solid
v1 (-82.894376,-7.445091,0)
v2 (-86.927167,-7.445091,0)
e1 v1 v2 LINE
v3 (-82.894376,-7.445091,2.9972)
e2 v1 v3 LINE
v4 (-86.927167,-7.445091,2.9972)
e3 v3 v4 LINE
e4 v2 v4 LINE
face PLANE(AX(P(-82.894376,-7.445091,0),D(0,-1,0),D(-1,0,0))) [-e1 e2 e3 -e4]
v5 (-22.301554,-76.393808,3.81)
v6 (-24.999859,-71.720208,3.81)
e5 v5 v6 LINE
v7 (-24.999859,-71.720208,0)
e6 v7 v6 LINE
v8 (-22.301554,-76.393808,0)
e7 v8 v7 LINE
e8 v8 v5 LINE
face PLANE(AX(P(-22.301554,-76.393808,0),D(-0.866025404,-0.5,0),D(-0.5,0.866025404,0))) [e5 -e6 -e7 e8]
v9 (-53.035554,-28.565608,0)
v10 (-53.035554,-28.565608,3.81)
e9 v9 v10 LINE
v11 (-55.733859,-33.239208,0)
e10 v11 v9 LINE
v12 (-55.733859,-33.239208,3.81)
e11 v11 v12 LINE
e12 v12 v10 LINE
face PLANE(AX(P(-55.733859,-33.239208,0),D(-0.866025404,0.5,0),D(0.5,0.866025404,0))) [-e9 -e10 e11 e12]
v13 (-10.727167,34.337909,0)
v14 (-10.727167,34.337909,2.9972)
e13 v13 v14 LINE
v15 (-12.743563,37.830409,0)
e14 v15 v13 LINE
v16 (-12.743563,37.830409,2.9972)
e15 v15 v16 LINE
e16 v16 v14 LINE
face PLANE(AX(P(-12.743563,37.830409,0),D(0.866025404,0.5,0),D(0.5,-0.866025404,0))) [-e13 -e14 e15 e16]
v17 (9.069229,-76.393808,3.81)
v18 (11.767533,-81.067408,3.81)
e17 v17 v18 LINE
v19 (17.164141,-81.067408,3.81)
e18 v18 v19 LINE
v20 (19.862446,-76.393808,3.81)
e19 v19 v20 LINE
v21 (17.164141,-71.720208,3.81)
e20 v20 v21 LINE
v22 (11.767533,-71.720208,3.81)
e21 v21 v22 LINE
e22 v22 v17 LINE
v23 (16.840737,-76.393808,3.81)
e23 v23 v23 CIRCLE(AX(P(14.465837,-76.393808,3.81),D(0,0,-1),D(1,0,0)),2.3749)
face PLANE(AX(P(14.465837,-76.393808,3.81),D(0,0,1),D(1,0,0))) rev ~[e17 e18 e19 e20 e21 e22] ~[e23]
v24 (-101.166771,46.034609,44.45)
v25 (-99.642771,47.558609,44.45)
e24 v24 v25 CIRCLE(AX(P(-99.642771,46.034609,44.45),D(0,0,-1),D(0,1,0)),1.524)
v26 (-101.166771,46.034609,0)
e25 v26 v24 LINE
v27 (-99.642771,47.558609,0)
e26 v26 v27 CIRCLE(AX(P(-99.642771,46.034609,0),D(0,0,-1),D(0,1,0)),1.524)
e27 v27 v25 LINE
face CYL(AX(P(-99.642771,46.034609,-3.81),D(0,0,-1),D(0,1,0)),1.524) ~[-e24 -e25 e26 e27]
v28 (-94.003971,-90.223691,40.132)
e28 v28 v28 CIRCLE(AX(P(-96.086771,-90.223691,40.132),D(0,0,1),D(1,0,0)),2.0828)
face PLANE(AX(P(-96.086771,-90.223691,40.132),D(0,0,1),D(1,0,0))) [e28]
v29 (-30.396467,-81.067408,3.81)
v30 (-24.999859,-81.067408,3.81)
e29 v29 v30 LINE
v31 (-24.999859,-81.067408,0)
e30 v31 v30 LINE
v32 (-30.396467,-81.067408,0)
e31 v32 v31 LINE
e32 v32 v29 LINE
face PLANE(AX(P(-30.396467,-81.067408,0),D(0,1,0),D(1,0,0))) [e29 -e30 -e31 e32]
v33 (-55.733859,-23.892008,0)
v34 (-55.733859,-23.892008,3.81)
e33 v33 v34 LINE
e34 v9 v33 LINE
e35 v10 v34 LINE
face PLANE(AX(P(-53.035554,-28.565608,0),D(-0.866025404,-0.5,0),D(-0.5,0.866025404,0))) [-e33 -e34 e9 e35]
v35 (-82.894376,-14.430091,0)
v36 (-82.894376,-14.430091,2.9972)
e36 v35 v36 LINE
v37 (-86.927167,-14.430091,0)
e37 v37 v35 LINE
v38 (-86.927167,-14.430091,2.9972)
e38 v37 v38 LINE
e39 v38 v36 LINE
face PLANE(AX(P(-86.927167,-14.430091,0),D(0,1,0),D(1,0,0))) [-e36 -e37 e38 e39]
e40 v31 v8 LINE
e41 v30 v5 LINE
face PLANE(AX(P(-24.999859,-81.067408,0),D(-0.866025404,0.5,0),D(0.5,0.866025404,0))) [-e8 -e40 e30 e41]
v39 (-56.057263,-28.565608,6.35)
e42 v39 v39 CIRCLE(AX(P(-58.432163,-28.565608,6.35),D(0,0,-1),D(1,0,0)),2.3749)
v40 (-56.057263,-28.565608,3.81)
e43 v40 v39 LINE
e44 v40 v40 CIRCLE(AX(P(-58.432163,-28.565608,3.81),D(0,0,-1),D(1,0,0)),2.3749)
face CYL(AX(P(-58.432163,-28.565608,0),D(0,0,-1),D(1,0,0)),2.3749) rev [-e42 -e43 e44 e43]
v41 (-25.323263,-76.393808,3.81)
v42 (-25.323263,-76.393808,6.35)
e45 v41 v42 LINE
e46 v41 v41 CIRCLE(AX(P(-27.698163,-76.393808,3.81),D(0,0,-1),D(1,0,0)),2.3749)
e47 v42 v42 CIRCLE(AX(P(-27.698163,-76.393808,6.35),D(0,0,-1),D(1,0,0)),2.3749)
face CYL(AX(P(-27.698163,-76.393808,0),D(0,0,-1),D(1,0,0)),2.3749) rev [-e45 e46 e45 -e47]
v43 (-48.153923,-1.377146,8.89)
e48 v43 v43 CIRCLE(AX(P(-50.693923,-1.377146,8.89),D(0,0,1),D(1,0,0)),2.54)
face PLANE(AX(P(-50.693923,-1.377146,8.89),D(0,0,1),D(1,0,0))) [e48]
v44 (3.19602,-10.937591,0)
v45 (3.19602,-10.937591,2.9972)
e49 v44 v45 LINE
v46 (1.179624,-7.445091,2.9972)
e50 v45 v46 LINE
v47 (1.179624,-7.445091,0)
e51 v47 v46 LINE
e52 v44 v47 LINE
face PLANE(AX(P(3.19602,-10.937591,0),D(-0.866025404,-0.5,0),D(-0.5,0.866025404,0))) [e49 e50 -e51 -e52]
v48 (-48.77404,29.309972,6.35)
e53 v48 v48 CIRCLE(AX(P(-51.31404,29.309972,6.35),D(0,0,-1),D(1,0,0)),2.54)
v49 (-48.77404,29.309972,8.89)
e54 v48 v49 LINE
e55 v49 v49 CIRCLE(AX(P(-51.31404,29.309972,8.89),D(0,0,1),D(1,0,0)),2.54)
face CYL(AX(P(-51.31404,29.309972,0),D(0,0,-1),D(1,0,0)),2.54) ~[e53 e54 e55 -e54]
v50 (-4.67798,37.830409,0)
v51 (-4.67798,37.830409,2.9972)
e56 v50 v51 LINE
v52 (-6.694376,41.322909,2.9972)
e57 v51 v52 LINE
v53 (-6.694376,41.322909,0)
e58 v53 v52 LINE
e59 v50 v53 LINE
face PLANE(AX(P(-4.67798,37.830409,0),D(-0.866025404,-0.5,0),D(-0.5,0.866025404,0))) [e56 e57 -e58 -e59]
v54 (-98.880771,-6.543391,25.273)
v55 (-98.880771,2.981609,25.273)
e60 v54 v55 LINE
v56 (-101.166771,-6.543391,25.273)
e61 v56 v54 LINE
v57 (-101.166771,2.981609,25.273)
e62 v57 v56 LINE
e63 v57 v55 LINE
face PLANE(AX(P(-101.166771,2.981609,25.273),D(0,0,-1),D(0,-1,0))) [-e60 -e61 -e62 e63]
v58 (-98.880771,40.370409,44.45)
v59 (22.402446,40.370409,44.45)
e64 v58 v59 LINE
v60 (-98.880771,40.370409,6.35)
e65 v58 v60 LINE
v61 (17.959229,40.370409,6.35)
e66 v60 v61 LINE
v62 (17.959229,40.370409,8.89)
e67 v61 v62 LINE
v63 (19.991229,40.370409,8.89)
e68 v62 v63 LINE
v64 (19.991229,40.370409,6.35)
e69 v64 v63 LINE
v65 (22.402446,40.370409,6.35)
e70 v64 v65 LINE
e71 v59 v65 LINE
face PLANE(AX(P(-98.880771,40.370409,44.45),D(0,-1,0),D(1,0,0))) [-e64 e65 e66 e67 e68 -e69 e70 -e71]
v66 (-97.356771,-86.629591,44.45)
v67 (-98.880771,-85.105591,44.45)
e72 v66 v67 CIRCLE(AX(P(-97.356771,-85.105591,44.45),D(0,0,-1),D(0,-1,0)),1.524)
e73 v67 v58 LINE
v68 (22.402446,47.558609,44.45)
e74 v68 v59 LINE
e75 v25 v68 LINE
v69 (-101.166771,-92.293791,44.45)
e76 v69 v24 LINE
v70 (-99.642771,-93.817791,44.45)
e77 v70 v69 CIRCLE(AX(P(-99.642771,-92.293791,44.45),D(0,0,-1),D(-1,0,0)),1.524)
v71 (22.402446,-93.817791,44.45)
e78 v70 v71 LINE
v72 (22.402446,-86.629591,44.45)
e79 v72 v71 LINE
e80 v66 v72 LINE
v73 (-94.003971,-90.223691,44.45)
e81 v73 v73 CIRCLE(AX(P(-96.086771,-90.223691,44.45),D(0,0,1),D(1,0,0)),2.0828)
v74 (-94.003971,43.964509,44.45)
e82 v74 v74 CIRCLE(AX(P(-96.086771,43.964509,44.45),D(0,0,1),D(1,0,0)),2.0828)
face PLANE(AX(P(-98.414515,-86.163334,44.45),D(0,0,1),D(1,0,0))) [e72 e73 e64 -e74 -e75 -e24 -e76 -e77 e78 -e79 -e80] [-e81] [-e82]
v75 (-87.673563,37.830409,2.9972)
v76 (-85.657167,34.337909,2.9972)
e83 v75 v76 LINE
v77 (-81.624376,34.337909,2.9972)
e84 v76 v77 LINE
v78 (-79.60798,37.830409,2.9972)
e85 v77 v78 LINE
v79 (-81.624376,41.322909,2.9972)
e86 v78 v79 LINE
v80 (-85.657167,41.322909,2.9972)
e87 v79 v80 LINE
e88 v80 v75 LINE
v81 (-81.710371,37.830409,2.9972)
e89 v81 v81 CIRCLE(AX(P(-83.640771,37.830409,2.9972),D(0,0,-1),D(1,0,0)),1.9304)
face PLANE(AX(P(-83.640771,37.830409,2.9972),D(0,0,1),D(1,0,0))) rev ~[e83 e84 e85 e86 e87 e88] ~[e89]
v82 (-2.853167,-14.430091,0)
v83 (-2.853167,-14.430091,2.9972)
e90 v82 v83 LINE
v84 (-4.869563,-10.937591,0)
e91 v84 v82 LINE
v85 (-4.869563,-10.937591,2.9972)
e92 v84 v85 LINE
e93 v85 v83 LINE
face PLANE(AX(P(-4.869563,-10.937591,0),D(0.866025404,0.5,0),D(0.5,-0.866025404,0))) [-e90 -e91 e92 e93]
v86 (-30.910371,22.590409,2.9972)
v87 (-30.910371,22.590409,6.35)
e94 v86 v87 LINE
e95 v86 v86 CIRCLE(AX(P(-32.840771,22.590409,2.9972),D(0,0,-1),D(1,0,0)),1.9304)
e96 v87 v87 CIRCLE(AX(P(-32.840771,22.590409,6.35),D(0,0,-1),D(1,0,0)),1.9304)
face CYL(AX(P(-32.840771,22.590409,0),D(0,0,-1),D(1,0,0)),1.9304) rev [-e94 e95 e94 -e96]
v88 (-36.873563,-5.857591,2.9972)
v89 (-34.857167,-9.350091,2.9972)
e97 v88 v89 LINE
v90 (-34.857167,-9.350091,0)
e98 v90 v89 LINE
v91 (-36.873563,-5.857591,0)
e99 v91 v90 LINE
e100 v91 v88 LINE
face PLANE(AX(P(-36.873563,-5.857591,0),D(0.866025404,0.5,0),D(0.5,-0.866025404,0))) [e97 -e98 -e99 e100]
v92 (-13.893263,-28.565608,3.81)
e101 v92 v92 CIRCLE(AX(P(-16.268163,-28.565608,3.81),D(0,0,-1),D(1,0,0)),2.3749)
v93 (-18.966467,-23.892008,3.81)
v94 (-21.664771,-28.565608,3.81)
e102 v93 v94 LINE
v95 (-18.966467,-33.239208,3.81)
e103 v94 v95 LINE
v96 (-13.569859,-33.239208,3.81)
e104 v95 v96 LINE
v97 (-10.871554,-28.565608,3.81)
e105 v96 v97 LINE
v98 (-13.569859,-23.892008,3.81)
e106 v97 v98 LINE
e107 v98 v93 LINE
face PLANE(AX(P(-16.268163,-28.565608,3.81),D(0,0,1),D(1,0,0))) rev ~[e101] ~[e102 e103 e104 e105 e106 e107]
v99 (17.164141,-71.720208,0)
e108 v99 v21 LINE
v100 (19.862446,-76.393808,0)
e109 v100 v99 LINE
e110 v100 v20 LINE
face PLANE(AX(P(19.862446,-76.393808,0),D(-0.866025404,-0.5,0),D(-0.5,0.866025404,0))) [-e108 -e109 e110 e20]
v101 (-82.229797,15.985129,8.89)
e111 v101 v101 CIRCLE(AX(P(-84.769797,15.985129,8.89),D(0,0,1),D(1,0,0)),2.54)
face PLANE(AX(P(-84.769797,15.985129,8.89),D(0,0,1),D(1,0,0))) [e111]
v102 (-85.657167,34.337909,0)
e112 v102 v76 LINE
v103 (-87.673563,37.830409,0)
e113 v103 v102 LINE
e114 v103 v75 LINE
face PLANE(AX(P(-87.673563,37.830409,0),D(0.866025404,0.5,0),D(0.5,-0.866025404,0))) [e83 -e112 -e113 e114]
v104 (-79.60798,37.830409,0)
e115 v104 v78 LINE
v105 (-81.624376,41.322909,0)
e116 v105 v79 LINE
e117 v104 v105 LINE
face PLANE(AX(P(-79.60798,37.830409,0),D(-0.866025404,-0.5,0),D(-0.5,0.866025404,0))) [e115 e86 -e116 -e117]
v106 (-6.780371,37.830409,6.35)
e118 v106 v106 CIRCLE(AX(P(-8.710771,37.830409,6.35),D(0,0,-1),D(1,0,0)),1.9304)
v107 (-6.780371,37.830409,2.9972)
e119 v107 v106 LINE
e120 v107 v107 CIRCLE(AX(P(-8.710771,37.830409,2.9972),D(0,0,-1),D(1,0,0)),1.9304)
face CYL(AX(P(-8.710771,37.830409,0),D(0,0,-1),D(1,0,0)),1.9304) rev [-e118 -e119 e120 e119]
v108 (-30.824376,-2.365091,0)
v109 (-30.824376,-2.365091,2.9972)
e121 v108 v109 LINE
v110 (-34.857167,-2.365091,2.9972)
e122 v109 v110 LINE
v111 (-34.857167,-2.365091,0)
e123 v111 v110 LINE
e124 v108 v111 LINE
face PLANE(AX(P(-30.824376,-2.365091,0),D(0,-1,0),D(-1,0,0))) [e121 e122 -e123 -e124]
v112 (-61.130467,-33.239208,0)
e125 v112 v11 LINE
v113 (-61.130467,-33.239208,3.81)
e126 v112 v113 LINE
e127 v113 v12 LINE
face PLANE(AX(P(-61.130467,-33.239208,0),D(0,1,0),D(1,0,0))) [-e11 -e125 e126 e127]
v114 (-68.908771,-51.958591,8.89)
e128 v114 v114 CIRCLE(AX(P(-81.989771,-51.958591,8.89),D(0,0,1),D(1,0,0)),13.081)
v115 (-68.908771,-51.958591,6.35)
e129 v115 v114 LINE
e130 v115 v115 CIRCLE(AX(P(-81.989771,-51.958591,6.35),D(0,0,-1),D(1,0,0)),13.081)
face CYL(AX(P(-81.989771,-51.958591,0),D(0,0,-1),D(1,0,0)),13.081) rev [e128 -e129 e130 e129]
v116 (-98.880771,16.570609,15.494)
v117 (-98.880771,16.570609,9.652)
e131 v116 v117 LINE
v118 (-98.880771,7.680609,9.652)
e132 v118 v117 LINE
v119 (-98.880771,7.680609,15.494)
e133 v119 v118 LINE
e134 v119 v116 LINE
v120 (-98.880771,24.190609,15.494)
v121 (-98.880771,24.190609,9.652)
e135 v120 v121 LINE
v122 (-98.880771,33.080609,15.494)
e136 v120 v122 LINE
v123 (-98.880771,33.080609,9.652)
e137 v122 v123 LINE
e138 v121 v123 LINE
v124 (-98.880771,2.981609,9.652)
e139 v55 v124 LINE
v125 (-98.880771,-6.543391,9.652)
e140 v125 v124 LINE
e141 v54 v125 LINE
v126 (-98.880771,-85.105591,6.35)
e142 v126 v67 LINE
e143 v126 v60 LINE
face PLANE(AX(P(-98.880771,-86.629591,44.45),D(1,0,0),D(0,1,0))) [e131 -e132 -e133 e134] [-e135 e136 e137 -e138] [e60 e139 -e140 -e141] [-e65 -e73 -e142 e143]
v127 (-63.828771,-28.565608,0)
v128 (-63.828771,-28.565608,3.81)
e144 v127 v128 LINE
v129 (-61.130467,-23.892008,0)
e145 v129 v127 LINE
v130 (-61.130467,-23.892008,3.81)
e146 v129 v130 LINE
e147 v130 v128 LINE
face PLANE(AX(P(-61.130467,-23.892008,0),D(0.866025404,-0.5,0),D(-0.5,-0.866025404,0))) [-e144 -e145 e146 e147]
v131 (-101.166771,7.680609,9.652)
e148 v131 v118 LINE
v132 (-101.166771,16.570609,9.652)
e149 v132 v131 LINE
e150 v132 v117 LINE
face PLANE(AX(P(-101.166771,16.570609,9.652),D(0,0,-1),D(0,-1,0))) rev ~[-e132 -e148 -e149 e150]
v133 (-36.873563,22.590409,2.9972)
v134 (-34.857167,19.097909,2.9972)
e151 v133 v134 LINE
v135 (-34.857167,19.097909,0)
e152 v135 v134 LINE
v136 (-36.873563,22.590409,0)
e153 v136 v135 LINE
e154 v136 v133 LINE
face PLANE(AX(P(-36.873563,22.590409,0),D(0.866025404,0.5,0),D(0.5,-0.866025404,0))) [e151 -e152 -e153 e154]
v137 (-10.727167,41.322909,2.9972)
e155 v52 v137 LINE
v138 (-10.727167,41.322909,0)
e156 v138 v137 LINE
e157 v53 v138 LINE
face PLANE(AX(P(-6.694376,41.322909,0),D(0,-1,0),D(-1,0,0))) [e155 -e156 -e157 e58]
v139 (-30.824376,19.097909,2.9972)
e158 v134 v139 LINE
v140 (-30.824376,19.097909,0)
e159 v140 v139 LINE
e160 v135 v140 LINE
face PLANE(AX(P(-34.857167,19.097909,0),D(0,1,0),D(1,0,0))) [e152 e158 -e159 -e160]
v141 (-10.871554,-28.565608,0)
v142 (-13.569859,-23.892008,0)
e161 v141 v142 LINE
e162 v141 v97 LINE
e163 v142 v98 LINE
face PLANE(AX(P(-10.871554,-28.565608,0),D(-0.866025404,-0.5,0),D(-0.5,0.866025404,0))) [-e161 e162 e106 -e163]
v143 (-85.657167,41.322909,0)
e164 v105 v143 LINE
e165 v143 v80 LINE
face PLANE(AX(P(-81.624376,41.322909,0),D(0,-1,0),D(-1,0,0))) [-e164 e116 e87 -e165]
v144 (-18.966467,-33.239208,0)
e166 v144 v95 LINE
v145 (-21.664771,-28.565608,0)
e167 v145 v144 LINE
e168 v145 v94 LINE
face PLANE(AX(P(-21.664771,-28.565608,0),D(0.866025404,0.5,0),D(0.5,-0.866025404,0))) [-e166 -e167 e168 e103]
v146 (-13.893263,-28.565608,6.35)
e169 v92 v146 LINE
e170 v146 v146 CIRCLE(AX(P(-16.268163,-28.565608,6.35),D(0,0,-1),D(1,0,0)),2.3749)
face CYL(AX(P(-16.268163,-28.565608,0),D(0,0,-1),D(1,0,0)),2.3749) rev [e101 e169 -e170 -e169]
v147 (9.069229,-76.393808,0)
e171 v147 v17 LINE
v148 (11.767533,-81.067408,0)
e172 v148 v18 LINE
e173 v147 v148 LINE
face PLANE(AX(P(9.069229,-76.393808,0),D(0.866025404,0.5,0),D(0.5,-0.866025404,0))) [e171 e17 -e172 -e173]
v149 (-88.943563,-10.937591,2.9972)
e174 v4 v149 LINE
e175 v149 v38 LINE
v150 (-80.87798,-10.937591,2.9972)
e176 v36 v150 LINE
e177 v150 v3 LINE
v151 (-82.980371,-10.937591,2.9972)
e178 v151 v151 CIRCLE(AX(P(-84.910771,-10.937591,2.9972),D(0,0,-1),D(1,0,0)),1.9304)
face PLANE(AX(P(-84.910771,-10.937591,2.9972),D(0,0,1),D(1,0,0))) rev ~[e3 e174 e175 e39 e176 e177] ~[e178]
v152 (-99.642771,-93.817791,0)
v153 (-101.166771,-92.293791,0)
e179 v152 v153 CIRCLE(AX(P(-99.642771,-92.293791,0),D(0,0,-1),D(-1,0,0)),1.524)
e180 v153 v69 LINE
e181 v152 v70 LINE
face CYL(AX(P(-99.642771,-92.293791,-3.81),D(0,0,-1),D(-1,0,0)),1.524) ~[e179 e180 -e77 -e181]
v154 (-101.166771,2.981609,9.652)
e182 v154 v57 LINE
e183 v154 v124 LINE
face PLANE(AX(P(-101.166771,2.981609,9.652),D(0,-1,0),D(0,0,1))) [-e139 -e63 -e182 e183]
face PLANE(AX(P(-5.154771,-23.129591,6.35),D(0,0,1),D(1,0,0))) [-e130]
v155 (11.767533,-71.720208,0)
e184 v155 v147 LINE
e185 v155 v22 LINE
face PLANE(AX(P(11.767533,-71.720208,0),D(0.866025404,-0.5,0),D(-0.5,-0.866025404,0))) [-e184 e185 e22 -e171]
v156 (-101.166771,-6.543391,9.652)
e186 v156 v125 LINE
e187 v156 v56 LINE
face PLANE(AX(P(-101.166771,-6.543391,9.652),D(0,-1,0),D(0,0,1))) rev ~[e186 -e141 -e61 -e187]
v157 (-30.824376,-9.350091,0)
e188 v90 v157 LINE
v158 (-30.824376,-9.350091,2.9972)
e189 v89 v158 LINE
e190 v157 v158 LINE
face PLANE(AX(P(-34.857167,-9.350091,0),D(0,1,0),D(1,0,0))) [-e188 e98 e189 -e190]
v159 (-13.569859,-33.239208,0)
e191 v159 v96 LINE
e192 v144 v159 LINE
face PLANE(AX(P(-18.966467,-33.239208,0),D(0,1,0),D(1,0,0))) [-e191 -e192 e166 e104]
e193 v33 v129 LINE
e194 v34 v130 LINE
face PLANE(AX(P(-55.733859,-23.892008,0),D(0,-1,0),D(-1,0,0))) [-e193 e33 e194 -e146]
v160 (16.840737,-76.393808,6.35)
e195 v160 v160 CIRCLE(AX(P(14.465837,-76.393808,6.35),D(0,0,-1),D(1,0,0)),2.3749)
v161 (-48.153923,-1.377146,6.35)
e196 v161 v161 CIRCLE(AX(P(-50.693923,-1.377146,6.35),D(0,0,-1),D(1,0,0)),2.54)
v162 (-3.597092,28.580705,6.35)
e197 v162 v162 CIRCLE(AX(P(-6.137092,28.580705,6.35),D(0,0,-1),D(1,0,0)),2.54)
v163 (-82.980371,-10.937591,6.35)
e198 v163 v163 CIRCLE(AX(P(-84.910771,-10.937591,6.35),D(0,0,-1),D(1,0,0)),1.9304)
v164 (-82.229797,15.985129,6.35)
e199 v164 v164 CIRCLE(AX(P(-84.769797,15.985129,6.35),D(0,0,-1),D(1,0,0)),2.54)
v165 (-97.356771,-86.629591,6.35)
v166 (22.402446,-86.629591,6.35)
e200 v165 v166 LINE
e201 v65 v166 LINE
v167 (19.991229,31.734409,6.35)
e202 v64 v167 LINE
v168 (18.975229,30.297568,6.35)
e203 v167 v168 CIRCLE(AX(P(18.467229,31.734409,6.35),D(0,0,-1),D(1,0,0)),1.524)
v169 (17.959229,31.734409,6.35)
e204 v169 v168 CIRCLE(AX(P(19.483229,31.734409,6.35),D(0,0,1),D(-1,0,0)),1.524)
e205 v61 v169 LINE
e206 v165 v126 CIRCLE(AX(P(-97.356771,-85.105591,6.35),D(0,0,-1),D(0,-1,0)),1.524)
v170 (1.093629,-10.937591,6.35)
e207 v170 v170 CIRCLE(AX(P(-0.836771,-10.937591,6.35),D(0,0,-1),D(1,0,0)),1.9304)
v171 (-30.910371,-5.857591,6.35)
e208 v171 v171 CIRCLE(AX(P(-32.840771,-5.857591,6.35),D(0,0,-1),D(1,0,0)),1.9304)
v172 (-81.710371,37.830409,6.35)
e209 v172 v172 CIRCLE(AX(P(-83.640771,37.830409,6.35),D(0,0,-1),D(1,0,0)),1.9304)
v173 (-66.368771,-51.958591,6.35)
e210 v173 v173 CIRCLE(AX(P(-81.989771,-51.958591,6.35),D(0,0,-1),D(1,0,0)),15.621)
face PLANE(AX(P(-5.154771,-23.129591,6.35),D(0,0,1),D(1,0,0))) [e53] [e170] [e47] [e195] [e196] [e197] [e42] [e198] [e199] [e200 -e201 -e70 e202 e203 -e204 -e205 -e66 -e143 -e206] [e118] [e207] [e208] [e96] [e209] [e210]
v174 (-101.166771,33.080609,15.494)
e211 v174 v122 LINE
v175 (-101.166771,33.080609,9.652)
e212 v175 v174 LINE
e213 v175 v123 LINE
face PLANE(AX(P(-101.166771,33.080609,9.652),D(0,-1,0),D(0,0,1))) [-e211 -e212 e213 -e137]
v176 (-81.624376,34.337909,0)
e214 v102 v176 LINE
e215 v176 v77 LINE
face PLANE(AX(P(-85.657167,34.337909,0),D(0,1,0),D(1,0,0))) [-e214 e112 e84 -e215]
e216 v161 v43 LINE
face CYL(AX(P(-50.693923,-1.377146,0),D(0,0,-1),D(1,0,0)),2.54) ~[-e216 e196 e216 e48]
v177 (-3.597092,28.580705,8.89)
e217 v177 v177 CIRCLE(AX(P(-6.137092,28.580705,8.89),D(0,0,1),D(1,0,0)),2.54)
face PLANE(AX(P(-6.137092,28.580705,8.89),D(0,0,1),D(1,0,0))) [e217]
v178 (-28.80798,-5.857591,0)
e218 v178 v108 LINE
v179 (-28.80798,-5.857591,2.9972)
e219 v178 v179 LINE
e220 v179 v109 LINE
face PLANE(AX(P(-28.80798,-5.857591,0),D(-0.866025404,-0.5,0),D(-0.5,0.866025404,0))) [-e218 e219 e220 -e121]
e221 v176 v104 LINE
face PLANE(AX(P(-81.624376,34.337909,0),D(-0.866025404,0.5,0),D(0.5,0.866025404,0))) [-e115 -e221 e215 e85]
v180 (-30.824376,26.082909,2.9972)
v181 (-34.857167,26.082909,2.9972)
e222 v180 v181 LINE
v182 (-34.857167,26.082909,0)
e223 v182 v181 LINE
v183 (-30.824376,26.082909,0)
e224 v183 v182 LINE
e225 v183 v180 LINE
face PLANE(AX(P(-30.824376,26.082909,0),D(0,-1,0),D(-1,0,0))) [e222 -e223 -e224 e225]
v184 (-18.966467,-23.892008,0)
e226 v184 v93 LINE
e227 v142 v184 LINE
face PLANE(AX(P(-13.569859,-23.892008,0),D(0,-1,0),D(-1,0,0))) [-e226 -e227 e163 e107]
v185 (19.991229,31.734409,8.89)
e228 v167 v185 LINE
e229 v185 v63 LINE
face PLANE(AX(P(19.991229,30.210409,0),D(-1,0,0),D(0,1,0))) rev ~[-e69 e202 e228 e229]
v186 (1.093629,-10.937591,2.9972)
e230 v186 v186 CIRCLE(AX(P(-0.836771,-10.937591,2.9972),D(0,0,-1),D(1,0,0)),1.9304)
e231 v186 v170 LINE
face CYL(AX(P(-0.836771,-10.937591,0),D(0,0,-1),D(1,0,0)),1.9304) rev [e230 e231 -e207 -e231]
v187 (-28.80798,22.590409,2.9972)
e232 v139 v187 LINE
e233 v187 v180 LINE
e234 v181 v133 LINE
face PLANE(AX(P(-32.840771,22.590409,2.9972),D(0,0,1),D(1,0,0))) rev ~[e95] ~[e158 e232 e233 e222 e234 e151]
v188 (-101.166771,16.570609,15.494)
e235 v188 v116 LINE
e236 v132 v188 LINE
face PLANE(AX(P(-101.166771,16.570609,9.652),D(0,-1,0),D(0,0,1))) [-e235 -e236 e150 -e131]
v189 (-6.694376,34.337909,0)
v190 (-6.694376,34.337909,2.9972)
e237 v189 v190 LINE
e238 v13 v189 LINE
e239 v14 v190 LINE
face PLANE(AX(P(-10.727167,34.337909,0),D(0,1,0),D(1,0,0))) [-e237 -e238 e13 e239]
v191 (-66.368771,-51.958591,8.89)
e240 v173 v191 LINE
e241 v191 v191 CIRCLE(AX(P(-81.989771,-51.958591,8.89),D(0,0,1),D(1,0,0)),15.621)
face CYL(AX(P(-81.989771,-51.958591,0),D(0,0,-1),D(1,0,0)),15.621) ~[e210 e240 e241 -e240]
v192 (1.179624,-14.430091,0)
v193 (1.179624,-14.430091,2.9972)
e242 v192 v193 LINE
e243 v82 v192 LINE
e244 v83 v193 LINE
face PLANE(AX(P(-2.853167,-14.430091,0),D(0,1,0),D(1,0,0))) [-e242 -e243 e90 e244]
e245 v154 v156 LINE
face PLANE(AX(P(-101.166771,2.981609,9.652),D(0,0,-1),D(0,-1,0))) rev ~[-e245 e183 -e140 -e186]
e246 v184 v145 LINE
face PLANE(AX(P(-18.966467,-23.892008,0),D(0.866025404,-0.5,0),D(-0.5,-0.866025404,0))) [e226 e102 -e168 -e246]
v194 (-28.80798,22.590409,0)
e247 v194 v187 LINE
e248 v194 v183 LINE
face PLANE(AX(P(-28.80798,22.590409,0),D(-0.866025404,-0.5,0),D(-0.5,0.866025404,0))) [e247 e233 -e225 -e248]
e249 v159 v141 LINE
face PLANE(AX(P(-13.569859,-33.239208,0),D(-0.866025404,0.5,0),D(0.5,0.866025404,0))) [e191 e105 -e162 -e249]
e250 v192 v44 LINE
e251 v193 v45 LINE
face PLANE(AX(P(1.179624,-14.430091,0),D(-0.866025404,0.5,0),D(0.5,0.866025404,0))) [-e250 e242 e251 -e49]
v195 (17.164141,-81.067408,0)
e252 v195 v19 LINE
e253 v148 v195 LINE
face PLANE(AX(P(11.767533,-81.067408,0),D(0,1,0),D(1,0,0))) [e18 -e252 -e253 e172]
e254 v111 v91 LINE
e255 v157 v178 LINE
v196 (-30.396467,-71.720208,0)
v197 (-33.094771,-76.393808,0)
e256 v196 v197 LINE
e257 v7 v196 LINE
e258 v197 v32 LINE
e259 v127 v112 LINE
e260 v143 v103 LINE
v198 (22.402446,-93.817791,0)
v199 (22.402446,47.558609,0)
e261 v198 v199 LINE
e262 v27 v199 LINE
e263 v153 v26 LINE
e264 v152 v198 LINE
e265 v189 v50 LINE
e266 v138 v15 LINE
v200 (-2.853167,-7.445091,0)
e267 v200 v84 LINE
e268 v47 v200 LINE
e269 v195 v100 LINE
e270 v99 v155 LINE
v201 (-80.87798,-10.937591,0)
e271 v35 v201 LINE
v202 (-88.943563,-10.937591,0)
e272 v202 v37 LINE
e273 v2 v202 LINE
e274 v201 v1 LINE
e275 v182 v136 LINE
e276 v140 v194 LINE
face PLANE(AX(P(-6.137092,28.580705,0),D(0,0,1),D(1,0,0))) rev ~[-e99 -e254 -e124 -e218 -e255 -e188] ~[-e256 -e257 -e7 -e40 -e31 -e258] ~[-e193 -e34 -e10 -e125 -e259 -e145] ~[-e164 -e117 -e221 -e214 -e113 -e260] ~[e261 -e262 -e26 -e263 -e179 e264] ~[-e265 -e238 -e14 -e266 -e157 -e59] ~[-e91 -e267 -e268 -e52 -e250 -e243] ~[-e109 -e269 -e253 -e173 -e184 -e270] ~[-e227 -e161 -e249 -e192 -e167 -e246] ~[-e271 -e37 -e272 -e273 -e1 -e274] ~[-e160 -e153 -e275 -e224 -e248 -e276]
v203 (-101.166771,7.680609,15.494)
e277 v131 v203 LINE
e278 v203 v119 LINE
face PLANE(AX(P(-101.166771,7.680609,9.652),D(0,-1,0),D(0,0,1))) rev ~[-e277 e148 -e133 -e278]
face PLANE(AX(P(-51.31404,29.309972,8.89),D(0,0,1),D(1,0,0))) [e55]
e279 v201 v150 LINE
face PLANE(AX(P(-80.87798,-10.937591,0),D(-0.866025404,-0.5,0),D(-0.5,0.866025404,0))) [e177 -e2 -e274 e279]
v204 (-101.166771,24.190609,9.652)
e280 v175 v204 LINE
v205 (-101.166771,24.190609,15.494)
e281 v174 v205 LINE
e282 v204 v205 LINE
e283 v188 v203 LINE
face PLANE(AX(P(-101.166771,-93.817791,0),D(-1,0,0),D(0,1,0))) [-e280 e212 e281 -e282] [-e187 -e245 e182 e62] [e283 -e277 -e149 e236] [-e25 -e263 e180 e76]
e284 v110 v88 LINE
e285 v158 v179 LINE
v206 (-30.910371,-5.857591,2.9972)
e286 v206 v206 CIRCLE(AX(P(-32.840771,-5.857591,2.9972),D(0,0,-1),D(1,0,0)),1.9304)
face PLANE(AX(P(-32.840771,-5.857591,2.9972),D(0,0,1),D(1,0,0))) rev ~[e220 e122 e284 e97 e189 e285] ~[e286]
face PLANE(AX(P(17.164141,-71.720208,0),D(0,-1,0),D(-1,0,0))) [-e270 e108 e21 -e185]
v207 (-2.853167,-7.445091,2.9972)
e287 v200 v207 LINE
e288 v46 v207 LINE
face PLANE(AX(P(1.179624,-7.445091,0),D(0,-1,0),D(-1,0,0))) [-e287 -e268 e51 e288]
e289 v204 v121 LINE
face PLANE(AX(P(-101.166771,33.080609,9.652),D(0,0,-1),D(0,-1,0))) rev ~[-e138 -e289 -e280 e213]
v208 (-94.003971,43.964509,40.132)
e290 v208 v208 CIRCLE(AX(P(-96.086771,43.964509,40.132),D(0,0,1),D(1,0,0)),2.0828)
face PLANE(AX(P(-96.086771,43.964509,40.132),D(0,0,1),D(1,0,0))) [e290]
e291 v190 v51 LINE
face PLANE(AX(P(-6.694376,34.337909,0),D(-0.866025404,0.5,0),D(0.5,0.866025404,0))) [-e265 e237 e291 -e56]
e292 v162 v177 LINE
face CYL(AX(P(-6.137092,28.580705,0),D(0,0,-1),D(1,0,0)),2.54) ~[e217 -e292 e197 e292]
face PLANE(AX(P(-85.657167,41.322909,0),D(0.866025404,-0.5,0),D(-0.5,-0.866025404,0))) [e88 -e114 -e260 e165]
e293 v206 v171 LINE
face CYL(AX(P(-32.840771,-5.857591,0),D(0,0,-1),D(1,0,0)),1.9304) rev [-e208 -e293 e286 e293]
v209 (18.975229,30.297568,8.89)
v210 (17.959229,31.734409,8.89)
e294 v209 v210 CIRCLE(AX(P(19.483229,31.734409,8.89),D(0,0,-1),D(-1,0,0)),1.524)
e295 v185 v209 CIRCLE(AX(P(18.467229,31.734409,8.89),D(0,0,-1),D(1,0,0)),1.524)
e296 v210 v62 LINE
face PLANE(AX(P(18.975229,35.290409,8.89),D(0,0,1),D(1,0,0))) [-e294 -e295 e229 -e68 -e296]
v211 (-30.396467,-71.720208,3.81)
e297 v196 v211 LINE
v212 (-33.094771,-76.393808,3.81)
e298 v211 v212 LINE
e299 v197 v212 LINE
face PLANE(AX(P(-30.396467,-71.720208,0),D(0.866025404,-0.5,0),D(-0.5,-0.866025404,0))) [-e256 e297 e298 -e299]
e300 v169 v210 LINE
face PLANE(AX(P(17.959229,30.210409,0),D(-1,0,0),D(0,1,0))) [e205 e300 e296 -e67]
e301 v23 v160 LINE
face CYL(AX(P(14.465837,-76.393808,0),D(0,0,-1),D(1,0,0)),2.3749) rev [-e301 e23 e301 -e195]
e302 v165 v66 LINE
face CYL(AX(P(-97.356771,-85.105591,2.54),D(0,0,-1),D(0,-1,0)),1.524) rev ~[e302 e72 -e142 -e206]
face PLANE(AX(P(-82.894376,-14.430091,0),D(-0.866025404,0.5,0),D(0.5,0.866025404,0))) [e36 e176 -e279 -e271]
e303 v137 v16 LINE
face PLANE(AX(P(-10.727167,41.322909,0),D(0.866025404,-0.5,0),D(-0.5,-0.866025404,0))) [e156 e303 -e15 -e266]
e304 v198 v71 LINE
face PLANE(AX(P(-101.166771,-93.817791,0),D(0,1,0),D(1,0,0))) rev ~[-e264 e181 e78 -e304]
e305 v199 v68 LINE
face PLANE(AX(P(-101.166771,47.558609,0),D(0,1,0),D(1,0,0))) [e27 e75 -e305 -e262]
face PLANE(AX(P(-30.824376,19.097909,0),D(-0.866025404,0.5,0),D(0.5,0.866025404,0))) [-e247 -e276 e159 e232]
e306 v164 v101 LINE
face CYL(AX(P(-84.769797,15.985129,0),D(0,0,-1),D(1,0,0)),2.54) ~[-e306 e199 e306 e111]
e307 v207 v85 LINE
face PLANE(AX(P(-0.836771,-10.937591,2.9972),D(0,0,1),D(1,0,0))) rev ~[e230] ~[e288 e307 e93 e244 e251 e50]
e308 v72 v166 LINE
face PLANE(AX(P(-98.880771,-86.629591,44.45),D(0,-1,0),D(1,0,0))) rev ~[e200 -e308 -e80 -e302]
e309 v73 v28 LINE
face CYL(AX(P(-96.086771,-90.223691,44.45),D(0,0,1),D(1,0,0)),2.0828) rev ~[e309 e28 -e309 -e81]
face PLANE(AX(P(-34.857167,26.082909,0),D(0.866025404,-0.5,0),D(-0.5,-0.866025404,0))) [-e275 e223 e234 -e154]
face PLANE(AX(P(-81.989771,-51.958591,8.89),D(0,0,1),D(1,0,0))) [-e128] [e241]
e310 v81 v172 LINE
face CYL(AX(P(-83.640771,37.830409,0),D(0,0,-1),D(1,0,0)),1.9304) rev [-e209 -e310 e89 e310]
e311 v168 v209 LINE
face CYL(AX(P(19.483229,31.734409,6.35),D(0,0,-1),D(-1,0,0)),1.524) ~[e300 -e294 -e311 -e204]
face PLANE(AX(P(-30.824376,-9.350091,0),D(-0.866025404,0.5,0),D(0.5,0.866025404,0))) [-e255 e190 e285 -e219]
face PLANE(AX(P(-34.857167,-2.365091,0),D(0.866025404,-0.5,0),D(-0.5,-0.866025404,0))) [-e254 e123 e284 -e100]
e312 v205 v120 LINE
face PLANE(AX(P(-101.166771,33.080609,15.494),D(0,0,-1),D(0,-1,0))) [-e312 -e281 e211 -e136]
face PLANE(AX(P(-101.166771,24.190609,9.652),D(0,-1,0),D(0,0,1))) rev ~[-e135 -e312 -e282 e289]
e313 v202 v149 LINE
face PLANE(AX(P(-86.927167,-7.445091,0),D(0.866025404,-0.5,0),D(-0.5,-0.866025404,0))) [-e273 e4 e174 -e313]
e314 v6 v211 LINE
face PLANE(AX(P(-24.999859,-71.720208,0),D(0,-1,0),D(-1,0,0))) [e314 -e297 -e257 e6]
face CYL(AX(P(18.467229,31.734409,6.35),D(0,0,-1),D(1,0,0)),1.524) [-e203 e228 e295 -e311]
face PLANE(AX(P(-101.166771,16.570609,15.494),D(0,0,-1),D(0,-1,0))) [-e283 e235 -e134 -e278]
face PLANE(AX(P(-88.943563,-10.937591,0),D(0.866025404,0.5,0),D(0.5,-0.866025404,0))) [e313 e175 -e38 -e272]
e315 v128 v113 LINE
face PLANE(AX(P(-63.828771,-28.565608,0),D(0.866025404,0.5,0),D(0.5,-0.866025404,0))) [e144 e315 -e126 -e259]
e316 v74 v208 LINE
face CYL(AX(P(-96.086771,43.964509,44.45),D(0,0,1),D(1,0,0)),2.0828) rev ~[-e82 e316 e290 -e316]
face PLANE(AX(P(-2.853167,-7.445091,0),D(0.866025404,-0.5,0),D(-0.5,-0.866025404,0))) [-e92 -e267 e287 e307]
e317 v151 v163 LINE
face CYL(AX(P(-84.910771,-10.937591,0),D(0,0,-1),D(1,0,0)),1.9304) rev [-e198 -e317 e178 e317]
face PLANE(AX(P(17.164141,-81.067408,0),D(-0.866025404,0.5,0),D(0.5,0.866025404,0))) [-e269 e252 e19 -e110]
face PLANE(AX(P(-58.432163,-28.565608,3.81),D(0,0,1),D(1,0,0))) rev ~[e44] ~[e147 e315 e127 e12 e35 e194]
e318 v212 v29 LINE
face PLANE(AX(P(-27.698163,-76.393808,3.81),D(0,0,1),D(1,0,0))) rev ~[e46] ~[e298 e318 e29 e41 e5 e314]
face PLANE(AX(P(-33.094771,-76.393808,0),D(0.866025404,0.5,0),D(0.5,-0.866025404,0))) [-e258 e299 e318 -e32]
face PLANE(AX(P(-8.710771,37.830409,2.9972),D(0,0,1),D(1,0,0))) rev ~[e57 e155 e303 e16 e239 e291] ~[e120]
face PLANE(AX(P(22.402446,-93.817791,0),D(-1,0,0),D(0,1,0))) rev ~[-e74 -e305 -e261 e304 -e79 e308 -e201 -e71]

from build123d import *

# Parameters (mm, degrees)
F5_W         = 192.786
F5_H         = 141.3764
F7_DEPTH     = 44.45
F12_W        = 187.452
F12_H        = 127
F14_DEPTH    = 38.1
F4_R         = 15.621
F4_R_2       = 13.081
F13_W        = 2.032
F13_H        = 10.16
F13_W_2      = 10.16
F13_H_2      = 2.032
F15_DEPTH    = 8.89
F16_DEPTH    = 2.9972
F17_DEPTH    = 3.81
F10_R        = 2.3749
F18_DEPTH    = 25.4
F3_R         = 1.9304
F19_DEPTH    = 25.4
F11_R        = 2.54
F20_DEPTH    = 8.89
F21_W        = 8.89
F21_H        = 5.842
F21_W_2      = 9.525
F21_H_2      = 15.621
F22_DEPTH    = 25.4
F23_R        = 2.0828
F24_DEPTH    = 4.318
F25_T1_DEPTH = 41.91
F25_T3_DEPTH = 52.07
F25_T5_DEPTH = 6.35
F26_W        = 69.2167831277
F26_H        = 141.3764
F27_DEPTH    = 50.8


# Not quite as in the source:
# - a fillet or chamfer that OpenCascade refuses, or shapes differently, is made with other operations: its cross-section is extruded or revolved along the edge and cut away or added


with BuildPart() as f7:
    # F5 (on Top) → F7 (new body)
    with BuildSketch(Plane.XY):
        with Locations((-4.773771323, -23.1295908162)):
            Rectangle(F5_W, F5_H)
    extrude(amount=F7_DEPTH)

    # F12 (on face) → F14 (cut)
    with BuildSketch(Plane.XY.offset(44.45)):
        with Locations((-5.154771323, -23.1295908162)):
            Rectangle(F12_W, F12_H)
    extrude(amount=-F14_DEPTH, mode=Mode.SUBTRACT)

    # F4 (on Top) + F13 (on Top) → F15 (join)
    with BuildSketch(Plane.XY):
        with Locations((-81.989771323, -51.9585908162)):
            Circle(F4_R)
        with Locations((-81.989771323, -51.9585908162)):
            Circle(F4_R_2, mode=Mode.SUBTRACT)
    with BuildSketch(Plane.XY):
        with Locations((18.975228677, 35.2904091838)):
            Rectangle(F13_W, F13_H)
        with Locations((47.6495291469, -25.7965908162)):
            Rectangle(F13_W_2, F13_H_2)
    extrude(amount=F15_DEPTH)

    # F6 (on face) → F16 (cut)
    with BuildSketch(Plane.XY):
        Polygon((-81.6243755079, 34.3379091838), (-79.6079796927, 37.8304091838), (-81.6243755079, 41.3229091838), (-85.6571671382, 41.3229091838), (-87.6735629533, 37.8304091838), (-85.6571671382, 34.3379091838), align=None)
        Polygon((-6.6943755079, 34.3379091838), (-4.6779796927, 37.8304091838), (-6.6943755079, 41.3229091838), (-10.7271671382, 41.3229091838), (-12.7435629533, 37.8304091838), (-10.7271671382, 34.3379091838), align=None)
        Polygon((-30.8243755079, 19.0979091838), (-28.8079796927, 22.5904091838), (-30.8243755079, 26.0829091838), (-34.8571671382, 26.0829091838), (-36.8735629533, 22.5904091838), (-34.8571671382, 19.0979091838), align=None)
        Polygon((-82.8943755079, -14.4300908162), (-80.8779796927, -10.9375908162), (-82.8943755079, -7.4450908162), (-86.9271671382, -7.4450908162), (-88.9435629533, -10.9375908162), (-86.9271671382, -14.4300908162), align=None)
        Polygon((-30.8243755079, -9.3500908162), (-28.8079796927, -5.8575908162), (-30.8243755079, -2.3650908162), (-34.8571671382, -2.3650908162), (-36.8735629533, -5.8575908162), (-34.8571671382, -9.3500908162), align=None)
        Polygon((1.1796244921, -14.4300908162), (3.1960203073, -10.9375908162), (1.1796244921, -7.4450908162), (-2.8531671382, -7.4450908162), (-4.8695629533, -10.9375908162), (-2.8531671382, -14.4300908162), align=None)
    extrude(amount=F16_DEPTH, mode=Mode.SUBTRACT)

    # F9 (on Top) → F17 (cut)
    with BuildSketch(Plane.XY):
        Polygon((-55.7338586688, -33.239207965), (-53.0355544507, -28.565607965), (-55.7338586688, -23.892007965), (-61.130467105, -23.892007965), (-63.828771323, -28.565607965), (-61.130467105, -33.239207965), align=None)
        Polygon((-24.9998586688, -81.067407965), (-22.3015544507, -76.393807965), (-24.9998586688, -71.720207965), (-30.396467105, -71.720207965), (-33.094771323, -76.393807965), (-30.396467105, -81.067407965), align=None)
        Polygon((17.1641413312, -71.720207965), (14.4658371131, -71.720207965), (11.767532895, -71.720207965), (9.069228677, -76.393807965), (11.767532895, -81.067407965), (17.1641413312, -81.067407965), (19.8624455493, -76.393807965), align=None)
        Polygon((-10.8715544507, -28.565607965), (-13.5698586688, -23.892007965), (-18.966467105, -23.892007965), (-21.664771323, -28.565607965), (-18.966467105, -33.239207965), (-13.5698586688, -33.239207965), align=None)
    extrude(amount=F17_DEPTH, mode=Mode.SUBTRACT)

    # F10 (on Top) → F18 (cut)
    with BuildSketch(Plane.XY):
        with Locations((-58.4321628869, -28.565607965)):
            Circle(F10_R)
        with Locations((-27.6981628869, -76.393807965)):
            Circle(F10_R)
        with Locations((-16.2681628869, -28.565607965)):
            Circle(F10_R)
        with Locations((14.4658371131, -76.393807965)):
            Circle(F10_R)
    extrude(amount=F18_DEPTH, mode=Mode.SUBTRACT)

    # F3 (on Top) → F19 (cut)
    with BuildSketch(Plane.XY):
        with Locations((-84.910771323, -10.9375908162)):
            Circle(F3_R)
        with Locations((-32.840771323, -5.8575908162)):
            Circle(F3_R)
        with Locations((-32.840771323, 22.5904091838)):
            Circle(F3_R)
        with Locations((-8.710771323, 37.8304091838)):
            Circle(F3_R)
        with Locations((-83.640771323, 37.8304091838)):
            Circle(F3_R)
        with Locations((-0.836771323, -10.9375908162)):
            Circle(F3_R)
    extrude(amount=F19_DEPTH, mode=Mode.SUBTRACT)

    # F11 (on Top) → F20 (join)
    with BuildSketch(Plane.XY):
        with Locations((-6.1370921321, 28.5807047039)):
            Circle(F11_R)
        with Locations((-51.3140404916, 29.3099723562)):
            Circle(F11_R)
        with Locations((-50.6939233637, -1.3771463051)):
            Circle(F11_R)
        with Locations((-84.7697969953, 15.9851294398)):
            Circle(F11_R)
    extrude(amount=F20_DEPTH)

    # F21 (on face) → F22 (cut)
    with BuildSketch(Plane(origin=(-101.166771323, 0, 0), x_dir=(0, -1, 0), z_dir=(-1, 0, 0))):
        with Locations((-12.1256091838, 12.573)):
            Rectangle(F21_W, F21_H)
        with Locations((-28.6356091838, 12.573)):
            Rectangle(F21_W, F21_H)
        with Locations((1.7808908162, 17.4625)):
            Rectangle(F21_W_2, F21_H_2)
    extrude(amount=-F22_DEPTH, mode=Mode.SUBTRACT)

    # F23 (on face) → F24 (cut)
    with BuildSketch(Plane.XY.offset(44.45)):
        with Locations((-96.086771323, -90.2236908162)):
            Circle(F23_R)
        with Locations((86.539228677, -90.2236908162)):
            Circle(F23_R)
        with Locations((86.539228677, 43.9645091838)):
            Circle(F23_R)
        with Locations((-96.086771323, 43.9645091838)):
            Circle(F23_R)
    extrude(amount=-F24_DEPTH, mode=Mode.SUBTRACT)

    # F25: fillet of radius 1.524 on 12 edges, made by hand

    # F25_s2 → F25_t1 (join)
    with BuildSketch(Plane.XY.offset(2.54)):
        with BuildLine():
            ThreePointArc((-97.356771323, -86.6295908162), (-98.4344020576, -86.1832215507), (-98.880771323, -85.1055908162))
            Line((-98.880771323, -85.1055908162), (-98.880771323, -86.6295908162))
            Line((-98.880771323, -86.6295908162), (-97.356771323, -86.6295908162))
        make_face()
        with BuildLine():
            ThreePointArc((88.571228677, -85.1055908162), (88.1248594115, -86.1832215507), (87.047228677, -86.6295908162))
            Line((87.047228677, -86.6295908162), (88.571228677, -86.6295908162))
            Line((88.571228677, -86.6295908162), (88.571228677, -85.1055908162))
        make_face()
    extrude(amount=F25_T1_DEPTH)

    # F25_s4 → F25_t3 (cut)
    with BuildSketch(Plane.XY.offset(-3.81)):
        with BuildLine():
            ThreePointArc((-99.642771323, 47.5586091838), (-100.7204020576, 47.1122399184), (-101.166771323, 46.0346091838))
            Line((-101.166771323, 46.0346091838), (-101.166771323, 47.5586091838))
            Line((-101.166771323, 47.5586091838), (-99.642771323, 47.5586091838))
        make_face()
        with BuildLine():
            ThreePointArc((-101.166771323, -92.2937908162), (-100.7204020576, -93.3714215507), (-99.642771323, -93.8177908162))
            Line((-99.642771323, -93.8177908162), (-101.166771323, -93.8177908162))
            Line((-101.166771323, -93.8177908162), (-101.166771323, -92.2937908162))
        make_face()
        with BuildLine():
            ThreePointArc((91.619228677, -92.2937908162), (91.1728594115, -93.3714215507), (90.095228677, -93.8177908162))
            Line((90.095228677, -93.8177908162), (91.619228677, -93.8177908162))
            Line((91.619228677, -93.8177908162), (91.619228677, -92.2937908162))
        make_face()
        with BuildLine():
            ThreePointArc((90.095228677, 47.5586091838), (91.1728594115, 47.1122399184), (91.619228677, 46.0346091838))
            Line((91.619228677, 46.0346091838), (91.619228677, 47.5586091838))
            Line((91.619228677, 47.5586091838), (90.095228677, 47.5586091838))
        make_face()
    extrude(amount=F25_T3_DEPTH, mode=Mode.SUBTRACT)

    # F25_s6 → F25_t5 (cut)
    with BuildSketch(Plane.XY.offset(6.35)):
        with BuildLine():
            ThreePointArc((17.959228677, 31.7344091838), (18.4055979424, 30.6567784493), (19.483228677, 30.2104091838))
            Line((19.483228677, 30.2104091838), (17.959228677, 30.2104091838))
            Line((17.959228677, 30.2104091838), (17.959228677, 31.7344091838))
        make_face()
        with BuildLine():
            ThreePointArc((42.5695291469, -25.2885908162), (43.0158984124, -26.3662215507), (44.0935291469, -26.8125908162))
            Line((44.0935291469, -26.8125908162), (42.5695291469, -26.8125908162))
            Line((42.5695291469, -26.8125908162), (42.5695291469, -25.2885908162))
        make_face()
        with BuildLine():
            ThreePointArc((42.5695291469, -26.3045908162), (43.0158984124, -25.2269600816), (44.0935291469, -24.7805908162))
            Line((44.0935291469, -24.7805908162), (42.5695291469, -24.7805908162))
            Line((42.5695291469, -24.7805908162), (42.5695291469, -26.3045908162))
        make_face()
        with BuildLine():
            ThreePointArc((19.991228677, 31.7344091838), (19.5448594115, 30.6567784493), (18.467228677, 30.2104091838))
            Line((18.467228677, 30.2104091838), (19.991228677, 30.2104091838))
            Line((19.991228677, 30.2104091838), (19.991228677, 31.7344091838))
        make_face()
        with BuildLine():
            ThreePointArc((51.2055291469, -26.8125908162), (52.2831598814, -26.3662215507), (52.7295291469, -25.2885908162))
            Line((52.7295291469, -25.2885908162), (52.7295291469, -26.8125908162))
            Line((52.7295291469, -26.8125908162), (51.2055291469, -26.8125908162))
        make_face()
        with BuildLine():
            ThreePointArc((51.2055291469, -24.7805908162), (52.2831598814, -25.2269600816), (52.7295291469, -26.3045908162))
            Line((52.7295291469, -26.3045908162), (52.7295291469, -24.7805908162))
            Line((52.7295291469, -24.7805908162), (51.2055291469, -24.7805908162))
        make_face()
    extrude(amount=F25_T5_DEPTH, mode=Mode.SUBTRACT)

    # F26 (on Top) → F27 (cut)
    with BuildSketch(Plane.XY):
        with Locations((57.0108371131, -23.1295908162)):
            Rectangle(F26_W, F26_H)
    extrude(amount=F27_DEPTH, mode=Mode.SUBTRACT)


solid = f7.part
